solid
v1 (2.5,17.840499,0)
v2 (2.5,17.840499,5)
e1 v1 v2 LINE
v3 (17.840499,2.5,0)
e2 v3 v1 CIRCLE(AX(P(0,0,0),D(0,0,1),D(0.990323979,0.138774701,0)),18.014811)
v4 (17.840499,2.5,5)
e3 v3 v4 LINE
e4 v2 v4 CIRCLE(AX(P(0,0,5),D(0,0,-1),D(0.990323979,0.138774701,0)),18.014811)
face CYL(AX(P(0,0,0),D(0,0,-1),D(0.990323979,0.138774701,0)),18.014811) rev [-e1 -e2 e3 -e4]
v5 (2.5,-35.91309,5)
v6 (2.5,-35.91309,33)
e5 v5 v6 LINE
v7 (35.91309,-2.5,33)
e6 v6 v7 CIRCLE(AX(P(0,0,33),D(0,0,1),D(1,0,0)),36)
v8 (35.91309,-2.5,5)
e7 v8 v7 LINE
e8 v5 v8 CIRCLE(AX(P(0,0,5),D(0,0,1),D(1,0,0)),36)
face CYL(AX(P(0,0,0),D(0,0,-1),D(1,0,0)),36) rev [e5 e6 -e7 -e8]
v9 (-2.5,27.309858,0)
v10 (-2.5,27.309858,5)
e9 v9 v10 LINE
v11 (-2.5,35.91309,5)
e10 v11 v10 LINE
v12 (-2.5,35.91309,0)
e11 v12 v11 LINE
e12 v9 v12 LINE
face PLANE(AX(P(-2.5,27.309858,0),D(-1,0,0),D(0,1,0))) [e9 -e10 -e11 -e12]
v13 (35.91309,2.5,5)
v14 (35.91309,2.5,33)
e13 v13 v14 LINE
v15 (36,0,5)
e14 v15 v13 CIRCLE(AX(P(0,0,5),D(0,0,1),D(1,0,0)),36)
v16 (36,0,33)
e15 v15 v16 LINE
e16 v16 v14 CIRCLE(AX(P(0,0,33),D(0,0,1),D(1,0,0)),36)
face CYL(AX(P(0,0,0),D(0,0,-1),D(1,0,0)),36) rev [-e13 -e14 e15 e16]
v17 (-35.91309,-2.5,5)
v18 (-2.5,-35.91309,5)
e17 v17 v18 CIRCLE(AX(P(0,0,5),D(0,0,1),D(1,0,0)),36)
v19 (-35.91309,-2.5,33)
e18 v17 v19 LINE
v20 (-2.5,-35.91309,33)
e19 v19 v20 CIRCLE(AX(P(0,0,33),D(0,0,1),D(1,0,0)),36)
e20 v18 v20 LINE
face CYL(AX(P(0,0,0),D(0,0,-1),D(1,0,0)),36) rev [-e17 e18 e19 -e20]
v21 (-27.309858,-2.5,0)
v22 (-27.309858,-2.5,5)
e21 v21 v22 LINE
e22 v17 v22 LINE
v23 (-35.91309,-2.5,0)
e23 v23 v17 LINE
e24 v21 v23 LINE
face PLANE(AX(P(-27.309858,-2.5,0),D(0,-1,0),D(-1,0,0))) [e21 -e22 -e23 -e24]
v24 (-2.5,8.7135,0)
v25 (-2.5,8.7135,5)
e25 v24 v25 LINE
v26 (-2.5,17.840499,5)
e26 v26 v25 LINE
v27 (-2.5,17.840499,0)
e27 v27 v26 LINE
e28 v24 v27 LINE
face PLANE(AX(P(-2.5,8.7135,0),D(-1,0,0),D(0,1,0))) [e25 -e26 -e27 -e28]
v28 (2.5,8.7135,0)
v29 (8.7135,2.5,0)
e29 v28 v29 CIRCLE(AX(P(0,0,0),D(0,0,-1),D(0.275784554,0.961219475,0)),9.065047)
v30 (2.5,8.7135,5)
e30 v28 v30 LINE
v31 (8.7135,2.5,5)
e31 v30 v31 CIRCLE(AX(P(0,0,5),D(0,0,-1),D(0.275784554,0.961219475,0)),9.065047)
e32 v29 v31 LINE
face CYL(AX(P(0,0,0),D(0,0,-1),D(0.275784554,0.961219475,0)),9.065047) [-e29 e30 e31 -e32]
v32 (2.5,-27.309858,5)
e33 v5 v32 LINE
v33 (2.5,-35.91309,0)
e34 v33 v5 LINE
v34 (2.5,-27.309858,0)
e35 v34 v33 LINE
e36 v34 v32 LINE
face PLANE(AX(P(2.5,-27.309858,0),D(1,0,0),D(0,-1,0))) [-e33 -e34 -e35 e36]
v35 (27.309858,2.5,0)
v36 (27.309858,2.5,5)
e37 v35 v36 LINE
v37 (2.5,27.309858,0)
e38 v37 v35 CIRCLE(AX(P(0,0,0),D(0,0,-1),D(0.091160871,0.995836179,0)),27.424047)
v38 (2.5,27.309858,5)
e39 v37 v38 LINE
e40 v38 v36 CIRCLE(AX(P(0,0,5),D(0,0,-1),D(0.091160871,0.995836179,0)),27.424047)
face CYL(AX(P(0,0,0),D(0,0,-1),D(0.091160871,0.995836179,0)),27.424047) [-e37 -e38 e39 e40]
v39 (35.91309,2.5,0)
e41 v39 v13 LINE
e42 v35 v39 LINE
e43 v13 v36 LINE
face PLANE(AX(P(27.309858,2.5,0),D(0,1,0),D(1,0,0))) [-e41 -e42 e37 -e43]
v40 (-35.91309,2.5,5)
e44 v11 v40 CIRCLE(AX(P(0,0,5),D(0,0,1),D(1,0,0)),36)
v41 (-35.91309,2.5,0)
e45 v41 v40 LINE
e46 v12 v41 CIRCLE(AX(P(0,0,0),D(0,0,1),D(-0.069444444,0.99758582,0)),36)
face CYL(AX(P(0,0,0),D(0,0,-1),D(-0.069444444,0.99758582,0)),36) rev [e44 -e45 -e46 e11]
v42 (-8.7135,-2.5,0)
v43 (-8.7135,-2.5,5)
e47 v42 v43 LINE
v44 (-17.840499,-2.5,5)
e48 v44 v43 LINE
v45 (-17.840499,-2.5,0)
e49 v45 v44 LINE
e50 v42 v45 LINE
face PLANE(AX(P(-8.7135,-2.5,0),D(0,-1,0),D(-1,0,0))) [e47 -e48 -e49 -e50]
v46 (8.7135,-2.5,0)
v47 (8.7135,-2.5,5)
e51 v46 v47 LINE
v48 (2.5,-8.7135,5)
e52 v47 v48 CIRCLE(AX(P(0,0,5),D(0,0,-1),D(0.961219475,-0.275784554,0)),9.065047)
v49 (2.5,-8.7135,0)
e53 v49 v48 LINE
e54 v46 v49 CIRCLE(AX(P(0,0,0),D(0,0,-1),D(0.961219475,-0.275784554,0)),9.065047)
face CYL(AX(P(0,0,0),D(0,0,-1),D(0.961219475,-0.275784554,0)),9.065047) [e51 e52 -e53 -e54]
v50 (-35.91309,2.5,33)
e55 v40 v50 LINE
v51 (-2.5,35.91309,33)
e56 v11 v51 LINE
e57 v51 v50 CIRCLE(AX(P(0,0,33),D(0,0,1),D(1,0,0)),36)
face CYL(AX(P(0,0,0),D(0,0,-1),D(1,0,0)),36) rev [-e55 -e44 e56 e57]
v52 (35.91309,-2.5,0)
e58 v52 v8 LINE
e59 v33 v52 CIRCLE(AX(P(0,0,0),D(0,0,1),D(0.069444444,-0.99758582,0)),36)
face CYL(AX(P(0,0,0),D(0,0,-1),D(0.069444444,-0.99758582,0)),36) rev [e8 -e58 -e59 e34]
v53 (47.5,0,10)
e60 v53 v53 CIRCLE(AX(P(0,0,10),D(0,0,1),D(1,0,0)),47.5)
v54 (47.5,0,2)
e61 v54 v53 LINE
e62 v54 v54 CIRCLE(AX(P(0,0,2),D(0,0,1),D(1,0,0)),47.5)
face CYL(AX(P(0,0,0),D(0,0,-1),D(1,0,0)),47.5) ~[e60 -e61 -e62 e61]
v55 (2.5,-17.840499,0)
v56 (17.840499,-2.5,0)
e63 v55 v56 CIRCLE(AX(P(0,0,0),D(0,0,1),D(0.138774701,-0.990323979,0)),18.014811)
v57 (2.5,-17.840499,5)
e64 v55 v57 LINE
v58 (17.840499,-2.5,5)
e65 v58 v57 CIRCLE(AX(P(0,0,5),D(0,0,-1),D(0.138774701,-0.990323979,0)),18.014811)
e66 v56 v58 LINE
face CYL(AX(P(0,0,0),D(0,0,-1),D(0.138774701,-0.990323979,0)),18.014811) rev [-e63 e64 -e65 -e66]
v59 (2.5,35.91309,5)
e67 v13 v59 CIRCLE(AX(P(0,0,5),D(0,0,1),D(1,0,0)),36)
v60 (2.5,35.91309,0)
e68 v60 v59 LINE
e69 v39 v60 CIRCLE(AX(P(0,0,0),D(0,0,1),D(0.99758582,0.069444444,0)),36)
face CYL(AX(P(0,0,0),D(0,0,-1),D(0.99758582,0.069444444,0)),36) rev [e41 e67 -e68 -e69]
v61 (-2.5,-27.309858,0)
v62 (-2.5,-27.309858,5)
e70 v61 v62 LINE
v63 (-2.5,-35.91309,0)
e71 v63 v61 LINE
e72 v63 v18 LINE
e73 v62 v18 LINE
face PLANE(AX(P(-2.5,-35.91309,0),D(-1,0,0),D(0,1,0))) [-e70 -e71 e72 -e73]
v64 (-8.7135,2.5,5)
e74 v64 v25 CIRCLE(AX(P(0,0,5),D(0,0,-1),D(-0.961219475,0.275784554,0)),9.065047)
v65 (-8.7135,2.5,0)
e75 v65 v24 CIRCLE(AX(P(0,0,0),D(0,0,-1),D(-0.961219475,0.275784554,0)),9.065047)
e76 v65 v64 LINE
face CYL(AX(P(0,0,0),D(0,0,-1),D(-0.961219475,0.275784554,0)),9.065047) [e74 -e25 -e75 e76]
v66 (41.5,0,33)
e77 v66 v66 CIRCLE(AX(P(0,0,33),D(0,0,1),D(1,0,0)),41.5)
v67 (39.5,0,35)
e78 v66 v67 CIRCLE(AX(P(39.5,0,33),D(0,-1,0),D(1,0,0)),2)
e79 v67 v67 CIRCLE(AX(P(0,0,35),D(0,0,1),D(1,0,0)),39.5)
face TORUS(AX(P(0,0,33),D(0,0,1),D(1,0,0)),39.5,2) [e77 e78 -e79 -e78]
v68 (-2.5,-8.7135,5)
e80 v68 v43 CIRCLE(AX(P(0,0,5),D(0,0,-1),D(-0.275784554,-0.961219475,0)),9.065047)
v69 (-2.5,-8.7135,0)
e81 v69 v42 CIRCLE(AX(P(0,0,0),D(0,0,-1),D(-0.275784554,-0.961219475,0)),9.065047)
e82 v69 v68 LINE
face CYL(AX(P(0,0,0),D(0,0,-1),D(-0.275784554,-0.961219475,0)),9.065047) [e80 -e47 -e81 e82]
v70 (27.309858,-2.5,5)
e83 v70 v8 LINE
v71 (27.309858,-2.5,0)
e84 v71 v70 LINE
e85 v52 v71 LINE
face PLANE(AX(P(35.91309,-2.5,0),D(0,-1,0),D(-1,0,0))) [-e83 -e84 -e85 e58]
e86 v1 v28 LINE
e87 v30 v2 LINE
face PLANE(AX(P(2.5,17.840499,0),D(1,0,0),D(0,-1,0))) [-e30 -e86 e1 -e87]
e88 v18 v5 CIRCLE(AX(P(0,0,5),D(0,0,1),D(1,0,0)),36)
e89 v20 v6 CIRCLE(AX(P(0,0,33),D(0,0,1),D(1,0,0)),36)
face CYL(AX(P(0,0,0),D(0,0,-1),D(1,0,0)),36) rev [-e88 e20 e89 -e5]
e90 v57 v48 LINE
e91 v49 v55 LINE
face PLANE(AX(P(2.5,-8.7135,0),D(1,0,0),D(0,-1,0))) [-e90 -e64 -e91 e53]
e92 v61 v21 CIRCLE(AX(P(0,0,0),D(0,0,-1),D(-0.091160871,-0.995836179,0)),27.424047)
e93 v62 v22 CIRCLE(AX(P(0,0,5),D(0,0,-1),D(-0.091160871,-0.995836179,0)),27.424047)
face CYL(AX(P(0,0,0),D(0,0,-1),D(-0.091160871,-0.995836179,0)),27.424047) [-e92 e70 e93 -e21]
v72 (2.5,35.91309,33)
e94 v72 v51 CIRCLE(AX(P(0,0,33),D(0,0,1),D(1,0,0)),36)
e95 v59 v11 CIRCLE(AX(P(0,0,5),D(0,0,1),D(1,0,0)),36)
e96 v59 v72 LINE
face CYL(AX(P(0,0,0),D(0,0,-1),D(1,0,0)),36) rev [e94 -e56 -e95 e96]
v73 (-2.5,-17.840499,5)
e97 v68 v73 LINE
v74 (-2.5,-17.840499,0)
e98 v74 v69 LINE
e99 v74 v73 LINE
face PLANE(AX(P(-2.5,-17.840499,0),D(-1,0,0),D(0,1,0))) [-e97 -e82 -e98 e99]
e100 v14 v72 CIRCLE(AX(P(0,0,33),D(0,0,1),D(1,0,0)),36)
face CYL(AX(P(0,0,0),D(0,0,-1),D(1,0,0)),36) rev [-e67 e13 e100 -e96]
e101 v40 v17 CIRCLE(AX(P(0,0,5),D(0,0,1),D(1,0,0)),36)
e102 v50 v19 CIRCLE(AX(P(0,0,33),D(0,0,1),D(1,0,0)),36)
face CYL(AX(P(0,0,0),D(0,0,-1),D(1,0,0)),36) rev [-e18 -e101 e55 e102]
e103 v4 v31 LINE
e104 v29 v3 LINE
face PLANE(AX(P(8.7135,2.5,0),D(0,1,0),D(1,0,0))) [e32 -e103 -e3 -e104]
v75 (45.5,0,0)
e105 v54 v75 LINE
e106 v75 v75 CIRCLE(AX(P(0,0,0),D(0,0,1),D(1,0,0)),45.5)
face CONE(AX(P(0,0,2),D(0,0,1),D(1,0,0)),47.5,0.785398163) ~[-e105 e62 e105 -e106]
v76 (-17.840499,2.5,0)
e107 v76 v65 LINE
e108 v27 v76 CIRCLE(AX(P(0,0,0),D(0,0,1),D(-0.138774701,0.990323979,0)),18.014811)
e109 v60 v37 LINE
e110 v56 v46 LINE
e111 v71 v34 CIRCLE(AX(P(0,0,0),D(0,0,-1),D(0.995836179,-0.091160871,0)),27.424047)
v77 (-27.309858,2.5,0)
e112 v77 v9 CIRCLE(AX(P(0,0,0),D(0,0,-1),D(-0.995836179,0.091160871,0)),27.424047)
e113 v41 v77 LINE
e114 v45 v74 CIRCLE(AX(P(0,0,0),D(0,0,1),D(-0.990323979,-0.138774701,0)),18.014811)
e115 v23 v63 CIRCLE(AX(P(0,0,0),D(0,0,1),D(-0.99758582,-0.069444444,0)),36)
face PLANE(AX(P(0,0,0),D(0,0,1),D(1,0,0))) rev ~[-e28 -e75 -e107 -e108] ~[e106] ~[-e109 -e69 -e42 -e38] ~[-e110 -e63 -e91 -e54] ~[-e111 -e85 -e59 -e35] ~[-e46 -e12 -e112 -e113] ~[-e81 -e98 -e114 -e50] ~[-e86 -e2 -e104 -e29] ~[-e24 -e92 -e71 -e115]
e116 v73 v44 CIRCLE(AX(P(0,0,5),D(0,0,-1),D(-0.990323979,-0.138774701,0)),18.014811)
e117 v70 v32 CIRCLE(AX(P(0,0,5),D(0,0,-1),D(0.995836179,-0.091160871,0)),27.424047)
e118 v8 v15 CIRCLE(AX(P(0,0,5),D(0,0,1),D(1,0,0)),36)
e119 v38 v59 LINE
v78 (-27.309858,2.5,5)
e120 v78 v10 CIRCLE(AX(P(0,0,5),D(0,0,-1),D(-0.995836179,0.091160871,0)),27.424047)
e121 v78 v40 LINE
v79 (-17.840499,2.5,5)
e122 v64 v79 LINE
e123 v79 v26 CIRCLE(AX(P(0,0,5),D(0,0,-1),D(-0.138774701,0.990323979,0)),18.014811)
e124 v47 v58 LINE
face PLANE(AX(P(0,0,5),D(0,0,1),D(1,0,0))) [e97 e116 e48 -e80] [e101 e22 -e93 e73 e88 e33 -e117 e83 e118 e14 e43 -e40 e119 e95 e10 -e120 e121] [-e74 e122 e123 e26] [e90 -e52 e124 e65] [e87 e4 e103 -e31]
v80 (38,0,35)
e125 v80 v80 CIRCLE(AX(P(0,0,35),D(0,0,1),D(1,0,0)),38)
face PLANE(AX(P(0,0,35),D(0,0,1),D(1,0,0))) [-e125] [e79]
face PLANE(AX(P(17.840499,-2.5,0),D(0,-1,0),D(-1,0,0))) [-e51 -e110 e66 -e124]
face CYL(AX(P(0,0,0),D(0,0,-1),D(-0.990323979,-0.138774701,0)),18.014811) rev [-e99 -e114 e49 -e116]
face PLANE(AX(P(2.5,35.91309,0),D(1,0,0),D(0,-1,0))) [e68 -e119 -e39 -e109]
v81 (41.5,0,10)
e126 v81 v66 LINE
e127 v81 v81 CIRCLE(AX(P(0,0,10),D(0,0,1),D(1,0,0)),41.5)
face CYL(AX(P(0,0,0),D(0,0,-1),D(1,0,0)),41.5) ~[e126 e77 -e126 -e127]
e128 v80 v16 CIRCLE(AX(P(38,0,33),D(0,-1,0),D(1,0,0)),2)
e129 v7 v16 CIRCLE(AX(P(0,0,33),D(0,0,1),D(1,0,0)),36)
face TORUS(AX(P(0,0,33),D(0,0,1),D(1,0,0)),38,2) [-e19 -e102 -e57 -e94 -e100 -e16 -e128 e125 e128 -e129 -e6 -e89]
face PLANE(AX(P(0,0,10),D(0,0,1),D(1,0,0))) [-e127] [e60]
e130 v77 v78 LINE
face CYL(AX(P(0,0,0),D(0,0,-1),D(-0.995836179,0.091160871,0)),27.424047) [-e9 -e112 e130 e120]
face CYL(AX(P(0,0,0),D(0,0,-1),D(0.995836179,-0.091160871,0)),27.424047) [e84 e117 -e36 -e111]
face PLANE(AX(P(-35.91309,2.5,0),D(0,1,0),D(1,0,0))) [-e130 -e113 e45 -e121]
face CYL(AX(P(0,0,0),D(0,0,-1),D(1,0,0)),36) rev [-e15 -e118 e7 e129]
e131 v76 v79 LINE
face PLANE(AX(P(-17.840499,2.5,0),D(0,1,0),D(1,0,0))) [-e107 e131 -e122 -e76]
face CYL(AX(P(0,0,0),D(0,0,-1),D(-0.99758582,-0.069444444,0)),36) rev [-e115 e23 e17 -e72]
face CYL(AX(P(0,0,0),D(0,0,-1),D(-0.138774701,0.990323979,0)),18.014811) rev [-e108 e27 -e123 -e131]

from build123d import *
from build123d import SkipClean  # not in build123d's __all__

# Parameters (mm, degrees)
F0_R     = 41.5
F0_R_2   = 36
F1_DEPTH = 35
F0_R_3   = 47.5
F2_DEPTH = 10
F3_DEPTH = 5
F4_R     = 2
F5_SIZE  = 2
F7_DEPTH = 40.1


with BuildPart() as f1:
    # F0 (on Top) → F1 (new body)
    with BuildSketch(Plane.XY):
        Circle(F0_R)
        Circle(F0_R_2, mode=Mode.SUBTRACT)
    extrude(amount=F1_DEPTH)

    # F0 (on Top) → F2 (join)
    with BuildSketch(Plane.XY):
        Circle(F0_R_3)
        Circle(F0_R, mode=Mode.SUBTRACT)
    extrude(amount=F2_DEPTH)

    # F0 (on Top) → F3 (join)
    with BuildSketch(Plane.XY):
        Circle(F0_R_2)
    extrude(amount=F3_DEPTH)

    # F4
    f4_edges = [f1.edges().sort_by_distance(p)[0] for p in [
        (-41.5, 0, 35),
        (-36, 0, 35),
    ]]
    fillet(f4_edges, radius=F4_R)

    # F5
    f5_edges = [f1.edges().sort_by_distance(p)[0] for p in [
        (-47.5, 0, 0),
    ]]
    chamfer(f5_edges, length=F5_SIZE)

    # F6 (on face) → F7 (cut)
    with BuildSketch(Plane.XY):
        with BuildLine():
            ThreePointArc((27.3098579389, -2.5), (19.3917294309, -19.3917294309), (2.5, -27.3098579389))
            Line((2.5, -27.3098579389), (2.5, -35.9130895357))
            ThreePointArc((2.5, -35.9130895357), (25.4558441227, -25.4558441227), (35.9130895357, -2.5))
            Line((35.9130895357, -2.5), (27.3098579389, -2.5))
        make_face()
        with BuildLine():
            Line((-2.5, -35.9130895357), (-2.5, -27.3098579389))
            ThreePointArc((-2.5, -27.3098579389), (-19.3917294309, -19.3917294309), (-27.3098579389, -2.5))
            Line((-27.3098579389, -2.5), (-35.9130895357, -2.5))
            ThreePointArc((-35.9130895357, -2.5), (-25.4558441227, -25.4558441227), (-2.5, -35.9130895357))
        make_face()
        with BuildLine():
            ThreePointArc((-27.3098579389, 2.5), (-19.3917294309, 19.3917294309), (-2.5, 27.3098579389))
            Line((-2.5, 27.3098579389), (-2.5, 35.9130895357))
            ThreePointArc((-2.5, 35.9130895357), (-25.4558441227, 25.4558441227), (-35.9130895357, 2.5))
            Line((-35.9130895357, 2.5), (-27.3098579389, 2.5))
        make_face()
        with BuildLine():
            Line((2.5, 35.9130895357), (2.5, 27.3098579389))
            ThreePointArc((2.5, 27.3098579389), (19.3917294309, 19.3917294309), (27.3098579389, 2.5))
            Line((27.3098579389, 2.5), (35.9130895357, 2.5))
            ThreePointArc((35.9130895357, 2.5), (25.4558441227, 25.4558441227), (2.5, 35.9130895357))
        make_face()
        with BuildLine():
            Line((2.5, 17.8404992818), (2.5, 8.7134999292))
            ThreePointArc((2.5, 8.7134999292), (6.4099563577, 6.4099563577), (8.7134999292, 2.5))
            Line((8.7134999292, 2.5), (17.8404992818, 2.5))
            ThreePointArc((17.8404992818, 2.5), (12.7383950053, 12.7383950053), (2.5, 17.8404992818))
        make_face()
        with BuildLine():
            ThreePointArc((8.7134999292, -2.5), (6.4099563577, -6.4099563577), (2.5, -8.7134999292))
            Line((2.5, -8.7134999292), (2.5, -17.8404992818))
            ThreePointArc((2.5, -17.8404992818), (12.7383950053, -12.7383950053), (17.8404992818, -2.5))
            Line((17.8404992818, -2.5), (8.7134999292, -2.5))
        make_face()
        with BuildLine():
            Line((-2.5, -17.8404992818), (-2.5, -8.7134999292))
            ThreePointArc((-2.5, -8.7134999292), (-6.4099563577, -6.4099563577), (-8.7134999292, -2.5))
            Line((-8.7134999292, -2.5), (-17.8404992818, -2.5))
            ThreePointArc((-17.8404992818, -2.5), (-12.7383950053, -12.7383950053), (-2.5, -17.8404992818))
        make_face()
        with BuildLine():
            ThreePointArc((-8.7134999292, 2.5), (-6.4099563577, 6.4099563577), (-2.5, 8.7134999292))
            Line((-2.5, 8.7134999292), (-2.5, 17.8404992818))
            ThreePointArc((-2.5, 17.8404992818), (-12.7383950053, 12.7383950053), (-17.8404992818, 2.5))
            Line((-17.8404992818, 2.5), (-8.7134999292, 2.5))
        make_face()
    with SkipClean():  # cleaning this boolean's faces spoils the solid; the shape is the same uncleaned
        extrude(amount=F7_DEPTH, mode=Mode.SUBTRACT)


solid = f1.part
